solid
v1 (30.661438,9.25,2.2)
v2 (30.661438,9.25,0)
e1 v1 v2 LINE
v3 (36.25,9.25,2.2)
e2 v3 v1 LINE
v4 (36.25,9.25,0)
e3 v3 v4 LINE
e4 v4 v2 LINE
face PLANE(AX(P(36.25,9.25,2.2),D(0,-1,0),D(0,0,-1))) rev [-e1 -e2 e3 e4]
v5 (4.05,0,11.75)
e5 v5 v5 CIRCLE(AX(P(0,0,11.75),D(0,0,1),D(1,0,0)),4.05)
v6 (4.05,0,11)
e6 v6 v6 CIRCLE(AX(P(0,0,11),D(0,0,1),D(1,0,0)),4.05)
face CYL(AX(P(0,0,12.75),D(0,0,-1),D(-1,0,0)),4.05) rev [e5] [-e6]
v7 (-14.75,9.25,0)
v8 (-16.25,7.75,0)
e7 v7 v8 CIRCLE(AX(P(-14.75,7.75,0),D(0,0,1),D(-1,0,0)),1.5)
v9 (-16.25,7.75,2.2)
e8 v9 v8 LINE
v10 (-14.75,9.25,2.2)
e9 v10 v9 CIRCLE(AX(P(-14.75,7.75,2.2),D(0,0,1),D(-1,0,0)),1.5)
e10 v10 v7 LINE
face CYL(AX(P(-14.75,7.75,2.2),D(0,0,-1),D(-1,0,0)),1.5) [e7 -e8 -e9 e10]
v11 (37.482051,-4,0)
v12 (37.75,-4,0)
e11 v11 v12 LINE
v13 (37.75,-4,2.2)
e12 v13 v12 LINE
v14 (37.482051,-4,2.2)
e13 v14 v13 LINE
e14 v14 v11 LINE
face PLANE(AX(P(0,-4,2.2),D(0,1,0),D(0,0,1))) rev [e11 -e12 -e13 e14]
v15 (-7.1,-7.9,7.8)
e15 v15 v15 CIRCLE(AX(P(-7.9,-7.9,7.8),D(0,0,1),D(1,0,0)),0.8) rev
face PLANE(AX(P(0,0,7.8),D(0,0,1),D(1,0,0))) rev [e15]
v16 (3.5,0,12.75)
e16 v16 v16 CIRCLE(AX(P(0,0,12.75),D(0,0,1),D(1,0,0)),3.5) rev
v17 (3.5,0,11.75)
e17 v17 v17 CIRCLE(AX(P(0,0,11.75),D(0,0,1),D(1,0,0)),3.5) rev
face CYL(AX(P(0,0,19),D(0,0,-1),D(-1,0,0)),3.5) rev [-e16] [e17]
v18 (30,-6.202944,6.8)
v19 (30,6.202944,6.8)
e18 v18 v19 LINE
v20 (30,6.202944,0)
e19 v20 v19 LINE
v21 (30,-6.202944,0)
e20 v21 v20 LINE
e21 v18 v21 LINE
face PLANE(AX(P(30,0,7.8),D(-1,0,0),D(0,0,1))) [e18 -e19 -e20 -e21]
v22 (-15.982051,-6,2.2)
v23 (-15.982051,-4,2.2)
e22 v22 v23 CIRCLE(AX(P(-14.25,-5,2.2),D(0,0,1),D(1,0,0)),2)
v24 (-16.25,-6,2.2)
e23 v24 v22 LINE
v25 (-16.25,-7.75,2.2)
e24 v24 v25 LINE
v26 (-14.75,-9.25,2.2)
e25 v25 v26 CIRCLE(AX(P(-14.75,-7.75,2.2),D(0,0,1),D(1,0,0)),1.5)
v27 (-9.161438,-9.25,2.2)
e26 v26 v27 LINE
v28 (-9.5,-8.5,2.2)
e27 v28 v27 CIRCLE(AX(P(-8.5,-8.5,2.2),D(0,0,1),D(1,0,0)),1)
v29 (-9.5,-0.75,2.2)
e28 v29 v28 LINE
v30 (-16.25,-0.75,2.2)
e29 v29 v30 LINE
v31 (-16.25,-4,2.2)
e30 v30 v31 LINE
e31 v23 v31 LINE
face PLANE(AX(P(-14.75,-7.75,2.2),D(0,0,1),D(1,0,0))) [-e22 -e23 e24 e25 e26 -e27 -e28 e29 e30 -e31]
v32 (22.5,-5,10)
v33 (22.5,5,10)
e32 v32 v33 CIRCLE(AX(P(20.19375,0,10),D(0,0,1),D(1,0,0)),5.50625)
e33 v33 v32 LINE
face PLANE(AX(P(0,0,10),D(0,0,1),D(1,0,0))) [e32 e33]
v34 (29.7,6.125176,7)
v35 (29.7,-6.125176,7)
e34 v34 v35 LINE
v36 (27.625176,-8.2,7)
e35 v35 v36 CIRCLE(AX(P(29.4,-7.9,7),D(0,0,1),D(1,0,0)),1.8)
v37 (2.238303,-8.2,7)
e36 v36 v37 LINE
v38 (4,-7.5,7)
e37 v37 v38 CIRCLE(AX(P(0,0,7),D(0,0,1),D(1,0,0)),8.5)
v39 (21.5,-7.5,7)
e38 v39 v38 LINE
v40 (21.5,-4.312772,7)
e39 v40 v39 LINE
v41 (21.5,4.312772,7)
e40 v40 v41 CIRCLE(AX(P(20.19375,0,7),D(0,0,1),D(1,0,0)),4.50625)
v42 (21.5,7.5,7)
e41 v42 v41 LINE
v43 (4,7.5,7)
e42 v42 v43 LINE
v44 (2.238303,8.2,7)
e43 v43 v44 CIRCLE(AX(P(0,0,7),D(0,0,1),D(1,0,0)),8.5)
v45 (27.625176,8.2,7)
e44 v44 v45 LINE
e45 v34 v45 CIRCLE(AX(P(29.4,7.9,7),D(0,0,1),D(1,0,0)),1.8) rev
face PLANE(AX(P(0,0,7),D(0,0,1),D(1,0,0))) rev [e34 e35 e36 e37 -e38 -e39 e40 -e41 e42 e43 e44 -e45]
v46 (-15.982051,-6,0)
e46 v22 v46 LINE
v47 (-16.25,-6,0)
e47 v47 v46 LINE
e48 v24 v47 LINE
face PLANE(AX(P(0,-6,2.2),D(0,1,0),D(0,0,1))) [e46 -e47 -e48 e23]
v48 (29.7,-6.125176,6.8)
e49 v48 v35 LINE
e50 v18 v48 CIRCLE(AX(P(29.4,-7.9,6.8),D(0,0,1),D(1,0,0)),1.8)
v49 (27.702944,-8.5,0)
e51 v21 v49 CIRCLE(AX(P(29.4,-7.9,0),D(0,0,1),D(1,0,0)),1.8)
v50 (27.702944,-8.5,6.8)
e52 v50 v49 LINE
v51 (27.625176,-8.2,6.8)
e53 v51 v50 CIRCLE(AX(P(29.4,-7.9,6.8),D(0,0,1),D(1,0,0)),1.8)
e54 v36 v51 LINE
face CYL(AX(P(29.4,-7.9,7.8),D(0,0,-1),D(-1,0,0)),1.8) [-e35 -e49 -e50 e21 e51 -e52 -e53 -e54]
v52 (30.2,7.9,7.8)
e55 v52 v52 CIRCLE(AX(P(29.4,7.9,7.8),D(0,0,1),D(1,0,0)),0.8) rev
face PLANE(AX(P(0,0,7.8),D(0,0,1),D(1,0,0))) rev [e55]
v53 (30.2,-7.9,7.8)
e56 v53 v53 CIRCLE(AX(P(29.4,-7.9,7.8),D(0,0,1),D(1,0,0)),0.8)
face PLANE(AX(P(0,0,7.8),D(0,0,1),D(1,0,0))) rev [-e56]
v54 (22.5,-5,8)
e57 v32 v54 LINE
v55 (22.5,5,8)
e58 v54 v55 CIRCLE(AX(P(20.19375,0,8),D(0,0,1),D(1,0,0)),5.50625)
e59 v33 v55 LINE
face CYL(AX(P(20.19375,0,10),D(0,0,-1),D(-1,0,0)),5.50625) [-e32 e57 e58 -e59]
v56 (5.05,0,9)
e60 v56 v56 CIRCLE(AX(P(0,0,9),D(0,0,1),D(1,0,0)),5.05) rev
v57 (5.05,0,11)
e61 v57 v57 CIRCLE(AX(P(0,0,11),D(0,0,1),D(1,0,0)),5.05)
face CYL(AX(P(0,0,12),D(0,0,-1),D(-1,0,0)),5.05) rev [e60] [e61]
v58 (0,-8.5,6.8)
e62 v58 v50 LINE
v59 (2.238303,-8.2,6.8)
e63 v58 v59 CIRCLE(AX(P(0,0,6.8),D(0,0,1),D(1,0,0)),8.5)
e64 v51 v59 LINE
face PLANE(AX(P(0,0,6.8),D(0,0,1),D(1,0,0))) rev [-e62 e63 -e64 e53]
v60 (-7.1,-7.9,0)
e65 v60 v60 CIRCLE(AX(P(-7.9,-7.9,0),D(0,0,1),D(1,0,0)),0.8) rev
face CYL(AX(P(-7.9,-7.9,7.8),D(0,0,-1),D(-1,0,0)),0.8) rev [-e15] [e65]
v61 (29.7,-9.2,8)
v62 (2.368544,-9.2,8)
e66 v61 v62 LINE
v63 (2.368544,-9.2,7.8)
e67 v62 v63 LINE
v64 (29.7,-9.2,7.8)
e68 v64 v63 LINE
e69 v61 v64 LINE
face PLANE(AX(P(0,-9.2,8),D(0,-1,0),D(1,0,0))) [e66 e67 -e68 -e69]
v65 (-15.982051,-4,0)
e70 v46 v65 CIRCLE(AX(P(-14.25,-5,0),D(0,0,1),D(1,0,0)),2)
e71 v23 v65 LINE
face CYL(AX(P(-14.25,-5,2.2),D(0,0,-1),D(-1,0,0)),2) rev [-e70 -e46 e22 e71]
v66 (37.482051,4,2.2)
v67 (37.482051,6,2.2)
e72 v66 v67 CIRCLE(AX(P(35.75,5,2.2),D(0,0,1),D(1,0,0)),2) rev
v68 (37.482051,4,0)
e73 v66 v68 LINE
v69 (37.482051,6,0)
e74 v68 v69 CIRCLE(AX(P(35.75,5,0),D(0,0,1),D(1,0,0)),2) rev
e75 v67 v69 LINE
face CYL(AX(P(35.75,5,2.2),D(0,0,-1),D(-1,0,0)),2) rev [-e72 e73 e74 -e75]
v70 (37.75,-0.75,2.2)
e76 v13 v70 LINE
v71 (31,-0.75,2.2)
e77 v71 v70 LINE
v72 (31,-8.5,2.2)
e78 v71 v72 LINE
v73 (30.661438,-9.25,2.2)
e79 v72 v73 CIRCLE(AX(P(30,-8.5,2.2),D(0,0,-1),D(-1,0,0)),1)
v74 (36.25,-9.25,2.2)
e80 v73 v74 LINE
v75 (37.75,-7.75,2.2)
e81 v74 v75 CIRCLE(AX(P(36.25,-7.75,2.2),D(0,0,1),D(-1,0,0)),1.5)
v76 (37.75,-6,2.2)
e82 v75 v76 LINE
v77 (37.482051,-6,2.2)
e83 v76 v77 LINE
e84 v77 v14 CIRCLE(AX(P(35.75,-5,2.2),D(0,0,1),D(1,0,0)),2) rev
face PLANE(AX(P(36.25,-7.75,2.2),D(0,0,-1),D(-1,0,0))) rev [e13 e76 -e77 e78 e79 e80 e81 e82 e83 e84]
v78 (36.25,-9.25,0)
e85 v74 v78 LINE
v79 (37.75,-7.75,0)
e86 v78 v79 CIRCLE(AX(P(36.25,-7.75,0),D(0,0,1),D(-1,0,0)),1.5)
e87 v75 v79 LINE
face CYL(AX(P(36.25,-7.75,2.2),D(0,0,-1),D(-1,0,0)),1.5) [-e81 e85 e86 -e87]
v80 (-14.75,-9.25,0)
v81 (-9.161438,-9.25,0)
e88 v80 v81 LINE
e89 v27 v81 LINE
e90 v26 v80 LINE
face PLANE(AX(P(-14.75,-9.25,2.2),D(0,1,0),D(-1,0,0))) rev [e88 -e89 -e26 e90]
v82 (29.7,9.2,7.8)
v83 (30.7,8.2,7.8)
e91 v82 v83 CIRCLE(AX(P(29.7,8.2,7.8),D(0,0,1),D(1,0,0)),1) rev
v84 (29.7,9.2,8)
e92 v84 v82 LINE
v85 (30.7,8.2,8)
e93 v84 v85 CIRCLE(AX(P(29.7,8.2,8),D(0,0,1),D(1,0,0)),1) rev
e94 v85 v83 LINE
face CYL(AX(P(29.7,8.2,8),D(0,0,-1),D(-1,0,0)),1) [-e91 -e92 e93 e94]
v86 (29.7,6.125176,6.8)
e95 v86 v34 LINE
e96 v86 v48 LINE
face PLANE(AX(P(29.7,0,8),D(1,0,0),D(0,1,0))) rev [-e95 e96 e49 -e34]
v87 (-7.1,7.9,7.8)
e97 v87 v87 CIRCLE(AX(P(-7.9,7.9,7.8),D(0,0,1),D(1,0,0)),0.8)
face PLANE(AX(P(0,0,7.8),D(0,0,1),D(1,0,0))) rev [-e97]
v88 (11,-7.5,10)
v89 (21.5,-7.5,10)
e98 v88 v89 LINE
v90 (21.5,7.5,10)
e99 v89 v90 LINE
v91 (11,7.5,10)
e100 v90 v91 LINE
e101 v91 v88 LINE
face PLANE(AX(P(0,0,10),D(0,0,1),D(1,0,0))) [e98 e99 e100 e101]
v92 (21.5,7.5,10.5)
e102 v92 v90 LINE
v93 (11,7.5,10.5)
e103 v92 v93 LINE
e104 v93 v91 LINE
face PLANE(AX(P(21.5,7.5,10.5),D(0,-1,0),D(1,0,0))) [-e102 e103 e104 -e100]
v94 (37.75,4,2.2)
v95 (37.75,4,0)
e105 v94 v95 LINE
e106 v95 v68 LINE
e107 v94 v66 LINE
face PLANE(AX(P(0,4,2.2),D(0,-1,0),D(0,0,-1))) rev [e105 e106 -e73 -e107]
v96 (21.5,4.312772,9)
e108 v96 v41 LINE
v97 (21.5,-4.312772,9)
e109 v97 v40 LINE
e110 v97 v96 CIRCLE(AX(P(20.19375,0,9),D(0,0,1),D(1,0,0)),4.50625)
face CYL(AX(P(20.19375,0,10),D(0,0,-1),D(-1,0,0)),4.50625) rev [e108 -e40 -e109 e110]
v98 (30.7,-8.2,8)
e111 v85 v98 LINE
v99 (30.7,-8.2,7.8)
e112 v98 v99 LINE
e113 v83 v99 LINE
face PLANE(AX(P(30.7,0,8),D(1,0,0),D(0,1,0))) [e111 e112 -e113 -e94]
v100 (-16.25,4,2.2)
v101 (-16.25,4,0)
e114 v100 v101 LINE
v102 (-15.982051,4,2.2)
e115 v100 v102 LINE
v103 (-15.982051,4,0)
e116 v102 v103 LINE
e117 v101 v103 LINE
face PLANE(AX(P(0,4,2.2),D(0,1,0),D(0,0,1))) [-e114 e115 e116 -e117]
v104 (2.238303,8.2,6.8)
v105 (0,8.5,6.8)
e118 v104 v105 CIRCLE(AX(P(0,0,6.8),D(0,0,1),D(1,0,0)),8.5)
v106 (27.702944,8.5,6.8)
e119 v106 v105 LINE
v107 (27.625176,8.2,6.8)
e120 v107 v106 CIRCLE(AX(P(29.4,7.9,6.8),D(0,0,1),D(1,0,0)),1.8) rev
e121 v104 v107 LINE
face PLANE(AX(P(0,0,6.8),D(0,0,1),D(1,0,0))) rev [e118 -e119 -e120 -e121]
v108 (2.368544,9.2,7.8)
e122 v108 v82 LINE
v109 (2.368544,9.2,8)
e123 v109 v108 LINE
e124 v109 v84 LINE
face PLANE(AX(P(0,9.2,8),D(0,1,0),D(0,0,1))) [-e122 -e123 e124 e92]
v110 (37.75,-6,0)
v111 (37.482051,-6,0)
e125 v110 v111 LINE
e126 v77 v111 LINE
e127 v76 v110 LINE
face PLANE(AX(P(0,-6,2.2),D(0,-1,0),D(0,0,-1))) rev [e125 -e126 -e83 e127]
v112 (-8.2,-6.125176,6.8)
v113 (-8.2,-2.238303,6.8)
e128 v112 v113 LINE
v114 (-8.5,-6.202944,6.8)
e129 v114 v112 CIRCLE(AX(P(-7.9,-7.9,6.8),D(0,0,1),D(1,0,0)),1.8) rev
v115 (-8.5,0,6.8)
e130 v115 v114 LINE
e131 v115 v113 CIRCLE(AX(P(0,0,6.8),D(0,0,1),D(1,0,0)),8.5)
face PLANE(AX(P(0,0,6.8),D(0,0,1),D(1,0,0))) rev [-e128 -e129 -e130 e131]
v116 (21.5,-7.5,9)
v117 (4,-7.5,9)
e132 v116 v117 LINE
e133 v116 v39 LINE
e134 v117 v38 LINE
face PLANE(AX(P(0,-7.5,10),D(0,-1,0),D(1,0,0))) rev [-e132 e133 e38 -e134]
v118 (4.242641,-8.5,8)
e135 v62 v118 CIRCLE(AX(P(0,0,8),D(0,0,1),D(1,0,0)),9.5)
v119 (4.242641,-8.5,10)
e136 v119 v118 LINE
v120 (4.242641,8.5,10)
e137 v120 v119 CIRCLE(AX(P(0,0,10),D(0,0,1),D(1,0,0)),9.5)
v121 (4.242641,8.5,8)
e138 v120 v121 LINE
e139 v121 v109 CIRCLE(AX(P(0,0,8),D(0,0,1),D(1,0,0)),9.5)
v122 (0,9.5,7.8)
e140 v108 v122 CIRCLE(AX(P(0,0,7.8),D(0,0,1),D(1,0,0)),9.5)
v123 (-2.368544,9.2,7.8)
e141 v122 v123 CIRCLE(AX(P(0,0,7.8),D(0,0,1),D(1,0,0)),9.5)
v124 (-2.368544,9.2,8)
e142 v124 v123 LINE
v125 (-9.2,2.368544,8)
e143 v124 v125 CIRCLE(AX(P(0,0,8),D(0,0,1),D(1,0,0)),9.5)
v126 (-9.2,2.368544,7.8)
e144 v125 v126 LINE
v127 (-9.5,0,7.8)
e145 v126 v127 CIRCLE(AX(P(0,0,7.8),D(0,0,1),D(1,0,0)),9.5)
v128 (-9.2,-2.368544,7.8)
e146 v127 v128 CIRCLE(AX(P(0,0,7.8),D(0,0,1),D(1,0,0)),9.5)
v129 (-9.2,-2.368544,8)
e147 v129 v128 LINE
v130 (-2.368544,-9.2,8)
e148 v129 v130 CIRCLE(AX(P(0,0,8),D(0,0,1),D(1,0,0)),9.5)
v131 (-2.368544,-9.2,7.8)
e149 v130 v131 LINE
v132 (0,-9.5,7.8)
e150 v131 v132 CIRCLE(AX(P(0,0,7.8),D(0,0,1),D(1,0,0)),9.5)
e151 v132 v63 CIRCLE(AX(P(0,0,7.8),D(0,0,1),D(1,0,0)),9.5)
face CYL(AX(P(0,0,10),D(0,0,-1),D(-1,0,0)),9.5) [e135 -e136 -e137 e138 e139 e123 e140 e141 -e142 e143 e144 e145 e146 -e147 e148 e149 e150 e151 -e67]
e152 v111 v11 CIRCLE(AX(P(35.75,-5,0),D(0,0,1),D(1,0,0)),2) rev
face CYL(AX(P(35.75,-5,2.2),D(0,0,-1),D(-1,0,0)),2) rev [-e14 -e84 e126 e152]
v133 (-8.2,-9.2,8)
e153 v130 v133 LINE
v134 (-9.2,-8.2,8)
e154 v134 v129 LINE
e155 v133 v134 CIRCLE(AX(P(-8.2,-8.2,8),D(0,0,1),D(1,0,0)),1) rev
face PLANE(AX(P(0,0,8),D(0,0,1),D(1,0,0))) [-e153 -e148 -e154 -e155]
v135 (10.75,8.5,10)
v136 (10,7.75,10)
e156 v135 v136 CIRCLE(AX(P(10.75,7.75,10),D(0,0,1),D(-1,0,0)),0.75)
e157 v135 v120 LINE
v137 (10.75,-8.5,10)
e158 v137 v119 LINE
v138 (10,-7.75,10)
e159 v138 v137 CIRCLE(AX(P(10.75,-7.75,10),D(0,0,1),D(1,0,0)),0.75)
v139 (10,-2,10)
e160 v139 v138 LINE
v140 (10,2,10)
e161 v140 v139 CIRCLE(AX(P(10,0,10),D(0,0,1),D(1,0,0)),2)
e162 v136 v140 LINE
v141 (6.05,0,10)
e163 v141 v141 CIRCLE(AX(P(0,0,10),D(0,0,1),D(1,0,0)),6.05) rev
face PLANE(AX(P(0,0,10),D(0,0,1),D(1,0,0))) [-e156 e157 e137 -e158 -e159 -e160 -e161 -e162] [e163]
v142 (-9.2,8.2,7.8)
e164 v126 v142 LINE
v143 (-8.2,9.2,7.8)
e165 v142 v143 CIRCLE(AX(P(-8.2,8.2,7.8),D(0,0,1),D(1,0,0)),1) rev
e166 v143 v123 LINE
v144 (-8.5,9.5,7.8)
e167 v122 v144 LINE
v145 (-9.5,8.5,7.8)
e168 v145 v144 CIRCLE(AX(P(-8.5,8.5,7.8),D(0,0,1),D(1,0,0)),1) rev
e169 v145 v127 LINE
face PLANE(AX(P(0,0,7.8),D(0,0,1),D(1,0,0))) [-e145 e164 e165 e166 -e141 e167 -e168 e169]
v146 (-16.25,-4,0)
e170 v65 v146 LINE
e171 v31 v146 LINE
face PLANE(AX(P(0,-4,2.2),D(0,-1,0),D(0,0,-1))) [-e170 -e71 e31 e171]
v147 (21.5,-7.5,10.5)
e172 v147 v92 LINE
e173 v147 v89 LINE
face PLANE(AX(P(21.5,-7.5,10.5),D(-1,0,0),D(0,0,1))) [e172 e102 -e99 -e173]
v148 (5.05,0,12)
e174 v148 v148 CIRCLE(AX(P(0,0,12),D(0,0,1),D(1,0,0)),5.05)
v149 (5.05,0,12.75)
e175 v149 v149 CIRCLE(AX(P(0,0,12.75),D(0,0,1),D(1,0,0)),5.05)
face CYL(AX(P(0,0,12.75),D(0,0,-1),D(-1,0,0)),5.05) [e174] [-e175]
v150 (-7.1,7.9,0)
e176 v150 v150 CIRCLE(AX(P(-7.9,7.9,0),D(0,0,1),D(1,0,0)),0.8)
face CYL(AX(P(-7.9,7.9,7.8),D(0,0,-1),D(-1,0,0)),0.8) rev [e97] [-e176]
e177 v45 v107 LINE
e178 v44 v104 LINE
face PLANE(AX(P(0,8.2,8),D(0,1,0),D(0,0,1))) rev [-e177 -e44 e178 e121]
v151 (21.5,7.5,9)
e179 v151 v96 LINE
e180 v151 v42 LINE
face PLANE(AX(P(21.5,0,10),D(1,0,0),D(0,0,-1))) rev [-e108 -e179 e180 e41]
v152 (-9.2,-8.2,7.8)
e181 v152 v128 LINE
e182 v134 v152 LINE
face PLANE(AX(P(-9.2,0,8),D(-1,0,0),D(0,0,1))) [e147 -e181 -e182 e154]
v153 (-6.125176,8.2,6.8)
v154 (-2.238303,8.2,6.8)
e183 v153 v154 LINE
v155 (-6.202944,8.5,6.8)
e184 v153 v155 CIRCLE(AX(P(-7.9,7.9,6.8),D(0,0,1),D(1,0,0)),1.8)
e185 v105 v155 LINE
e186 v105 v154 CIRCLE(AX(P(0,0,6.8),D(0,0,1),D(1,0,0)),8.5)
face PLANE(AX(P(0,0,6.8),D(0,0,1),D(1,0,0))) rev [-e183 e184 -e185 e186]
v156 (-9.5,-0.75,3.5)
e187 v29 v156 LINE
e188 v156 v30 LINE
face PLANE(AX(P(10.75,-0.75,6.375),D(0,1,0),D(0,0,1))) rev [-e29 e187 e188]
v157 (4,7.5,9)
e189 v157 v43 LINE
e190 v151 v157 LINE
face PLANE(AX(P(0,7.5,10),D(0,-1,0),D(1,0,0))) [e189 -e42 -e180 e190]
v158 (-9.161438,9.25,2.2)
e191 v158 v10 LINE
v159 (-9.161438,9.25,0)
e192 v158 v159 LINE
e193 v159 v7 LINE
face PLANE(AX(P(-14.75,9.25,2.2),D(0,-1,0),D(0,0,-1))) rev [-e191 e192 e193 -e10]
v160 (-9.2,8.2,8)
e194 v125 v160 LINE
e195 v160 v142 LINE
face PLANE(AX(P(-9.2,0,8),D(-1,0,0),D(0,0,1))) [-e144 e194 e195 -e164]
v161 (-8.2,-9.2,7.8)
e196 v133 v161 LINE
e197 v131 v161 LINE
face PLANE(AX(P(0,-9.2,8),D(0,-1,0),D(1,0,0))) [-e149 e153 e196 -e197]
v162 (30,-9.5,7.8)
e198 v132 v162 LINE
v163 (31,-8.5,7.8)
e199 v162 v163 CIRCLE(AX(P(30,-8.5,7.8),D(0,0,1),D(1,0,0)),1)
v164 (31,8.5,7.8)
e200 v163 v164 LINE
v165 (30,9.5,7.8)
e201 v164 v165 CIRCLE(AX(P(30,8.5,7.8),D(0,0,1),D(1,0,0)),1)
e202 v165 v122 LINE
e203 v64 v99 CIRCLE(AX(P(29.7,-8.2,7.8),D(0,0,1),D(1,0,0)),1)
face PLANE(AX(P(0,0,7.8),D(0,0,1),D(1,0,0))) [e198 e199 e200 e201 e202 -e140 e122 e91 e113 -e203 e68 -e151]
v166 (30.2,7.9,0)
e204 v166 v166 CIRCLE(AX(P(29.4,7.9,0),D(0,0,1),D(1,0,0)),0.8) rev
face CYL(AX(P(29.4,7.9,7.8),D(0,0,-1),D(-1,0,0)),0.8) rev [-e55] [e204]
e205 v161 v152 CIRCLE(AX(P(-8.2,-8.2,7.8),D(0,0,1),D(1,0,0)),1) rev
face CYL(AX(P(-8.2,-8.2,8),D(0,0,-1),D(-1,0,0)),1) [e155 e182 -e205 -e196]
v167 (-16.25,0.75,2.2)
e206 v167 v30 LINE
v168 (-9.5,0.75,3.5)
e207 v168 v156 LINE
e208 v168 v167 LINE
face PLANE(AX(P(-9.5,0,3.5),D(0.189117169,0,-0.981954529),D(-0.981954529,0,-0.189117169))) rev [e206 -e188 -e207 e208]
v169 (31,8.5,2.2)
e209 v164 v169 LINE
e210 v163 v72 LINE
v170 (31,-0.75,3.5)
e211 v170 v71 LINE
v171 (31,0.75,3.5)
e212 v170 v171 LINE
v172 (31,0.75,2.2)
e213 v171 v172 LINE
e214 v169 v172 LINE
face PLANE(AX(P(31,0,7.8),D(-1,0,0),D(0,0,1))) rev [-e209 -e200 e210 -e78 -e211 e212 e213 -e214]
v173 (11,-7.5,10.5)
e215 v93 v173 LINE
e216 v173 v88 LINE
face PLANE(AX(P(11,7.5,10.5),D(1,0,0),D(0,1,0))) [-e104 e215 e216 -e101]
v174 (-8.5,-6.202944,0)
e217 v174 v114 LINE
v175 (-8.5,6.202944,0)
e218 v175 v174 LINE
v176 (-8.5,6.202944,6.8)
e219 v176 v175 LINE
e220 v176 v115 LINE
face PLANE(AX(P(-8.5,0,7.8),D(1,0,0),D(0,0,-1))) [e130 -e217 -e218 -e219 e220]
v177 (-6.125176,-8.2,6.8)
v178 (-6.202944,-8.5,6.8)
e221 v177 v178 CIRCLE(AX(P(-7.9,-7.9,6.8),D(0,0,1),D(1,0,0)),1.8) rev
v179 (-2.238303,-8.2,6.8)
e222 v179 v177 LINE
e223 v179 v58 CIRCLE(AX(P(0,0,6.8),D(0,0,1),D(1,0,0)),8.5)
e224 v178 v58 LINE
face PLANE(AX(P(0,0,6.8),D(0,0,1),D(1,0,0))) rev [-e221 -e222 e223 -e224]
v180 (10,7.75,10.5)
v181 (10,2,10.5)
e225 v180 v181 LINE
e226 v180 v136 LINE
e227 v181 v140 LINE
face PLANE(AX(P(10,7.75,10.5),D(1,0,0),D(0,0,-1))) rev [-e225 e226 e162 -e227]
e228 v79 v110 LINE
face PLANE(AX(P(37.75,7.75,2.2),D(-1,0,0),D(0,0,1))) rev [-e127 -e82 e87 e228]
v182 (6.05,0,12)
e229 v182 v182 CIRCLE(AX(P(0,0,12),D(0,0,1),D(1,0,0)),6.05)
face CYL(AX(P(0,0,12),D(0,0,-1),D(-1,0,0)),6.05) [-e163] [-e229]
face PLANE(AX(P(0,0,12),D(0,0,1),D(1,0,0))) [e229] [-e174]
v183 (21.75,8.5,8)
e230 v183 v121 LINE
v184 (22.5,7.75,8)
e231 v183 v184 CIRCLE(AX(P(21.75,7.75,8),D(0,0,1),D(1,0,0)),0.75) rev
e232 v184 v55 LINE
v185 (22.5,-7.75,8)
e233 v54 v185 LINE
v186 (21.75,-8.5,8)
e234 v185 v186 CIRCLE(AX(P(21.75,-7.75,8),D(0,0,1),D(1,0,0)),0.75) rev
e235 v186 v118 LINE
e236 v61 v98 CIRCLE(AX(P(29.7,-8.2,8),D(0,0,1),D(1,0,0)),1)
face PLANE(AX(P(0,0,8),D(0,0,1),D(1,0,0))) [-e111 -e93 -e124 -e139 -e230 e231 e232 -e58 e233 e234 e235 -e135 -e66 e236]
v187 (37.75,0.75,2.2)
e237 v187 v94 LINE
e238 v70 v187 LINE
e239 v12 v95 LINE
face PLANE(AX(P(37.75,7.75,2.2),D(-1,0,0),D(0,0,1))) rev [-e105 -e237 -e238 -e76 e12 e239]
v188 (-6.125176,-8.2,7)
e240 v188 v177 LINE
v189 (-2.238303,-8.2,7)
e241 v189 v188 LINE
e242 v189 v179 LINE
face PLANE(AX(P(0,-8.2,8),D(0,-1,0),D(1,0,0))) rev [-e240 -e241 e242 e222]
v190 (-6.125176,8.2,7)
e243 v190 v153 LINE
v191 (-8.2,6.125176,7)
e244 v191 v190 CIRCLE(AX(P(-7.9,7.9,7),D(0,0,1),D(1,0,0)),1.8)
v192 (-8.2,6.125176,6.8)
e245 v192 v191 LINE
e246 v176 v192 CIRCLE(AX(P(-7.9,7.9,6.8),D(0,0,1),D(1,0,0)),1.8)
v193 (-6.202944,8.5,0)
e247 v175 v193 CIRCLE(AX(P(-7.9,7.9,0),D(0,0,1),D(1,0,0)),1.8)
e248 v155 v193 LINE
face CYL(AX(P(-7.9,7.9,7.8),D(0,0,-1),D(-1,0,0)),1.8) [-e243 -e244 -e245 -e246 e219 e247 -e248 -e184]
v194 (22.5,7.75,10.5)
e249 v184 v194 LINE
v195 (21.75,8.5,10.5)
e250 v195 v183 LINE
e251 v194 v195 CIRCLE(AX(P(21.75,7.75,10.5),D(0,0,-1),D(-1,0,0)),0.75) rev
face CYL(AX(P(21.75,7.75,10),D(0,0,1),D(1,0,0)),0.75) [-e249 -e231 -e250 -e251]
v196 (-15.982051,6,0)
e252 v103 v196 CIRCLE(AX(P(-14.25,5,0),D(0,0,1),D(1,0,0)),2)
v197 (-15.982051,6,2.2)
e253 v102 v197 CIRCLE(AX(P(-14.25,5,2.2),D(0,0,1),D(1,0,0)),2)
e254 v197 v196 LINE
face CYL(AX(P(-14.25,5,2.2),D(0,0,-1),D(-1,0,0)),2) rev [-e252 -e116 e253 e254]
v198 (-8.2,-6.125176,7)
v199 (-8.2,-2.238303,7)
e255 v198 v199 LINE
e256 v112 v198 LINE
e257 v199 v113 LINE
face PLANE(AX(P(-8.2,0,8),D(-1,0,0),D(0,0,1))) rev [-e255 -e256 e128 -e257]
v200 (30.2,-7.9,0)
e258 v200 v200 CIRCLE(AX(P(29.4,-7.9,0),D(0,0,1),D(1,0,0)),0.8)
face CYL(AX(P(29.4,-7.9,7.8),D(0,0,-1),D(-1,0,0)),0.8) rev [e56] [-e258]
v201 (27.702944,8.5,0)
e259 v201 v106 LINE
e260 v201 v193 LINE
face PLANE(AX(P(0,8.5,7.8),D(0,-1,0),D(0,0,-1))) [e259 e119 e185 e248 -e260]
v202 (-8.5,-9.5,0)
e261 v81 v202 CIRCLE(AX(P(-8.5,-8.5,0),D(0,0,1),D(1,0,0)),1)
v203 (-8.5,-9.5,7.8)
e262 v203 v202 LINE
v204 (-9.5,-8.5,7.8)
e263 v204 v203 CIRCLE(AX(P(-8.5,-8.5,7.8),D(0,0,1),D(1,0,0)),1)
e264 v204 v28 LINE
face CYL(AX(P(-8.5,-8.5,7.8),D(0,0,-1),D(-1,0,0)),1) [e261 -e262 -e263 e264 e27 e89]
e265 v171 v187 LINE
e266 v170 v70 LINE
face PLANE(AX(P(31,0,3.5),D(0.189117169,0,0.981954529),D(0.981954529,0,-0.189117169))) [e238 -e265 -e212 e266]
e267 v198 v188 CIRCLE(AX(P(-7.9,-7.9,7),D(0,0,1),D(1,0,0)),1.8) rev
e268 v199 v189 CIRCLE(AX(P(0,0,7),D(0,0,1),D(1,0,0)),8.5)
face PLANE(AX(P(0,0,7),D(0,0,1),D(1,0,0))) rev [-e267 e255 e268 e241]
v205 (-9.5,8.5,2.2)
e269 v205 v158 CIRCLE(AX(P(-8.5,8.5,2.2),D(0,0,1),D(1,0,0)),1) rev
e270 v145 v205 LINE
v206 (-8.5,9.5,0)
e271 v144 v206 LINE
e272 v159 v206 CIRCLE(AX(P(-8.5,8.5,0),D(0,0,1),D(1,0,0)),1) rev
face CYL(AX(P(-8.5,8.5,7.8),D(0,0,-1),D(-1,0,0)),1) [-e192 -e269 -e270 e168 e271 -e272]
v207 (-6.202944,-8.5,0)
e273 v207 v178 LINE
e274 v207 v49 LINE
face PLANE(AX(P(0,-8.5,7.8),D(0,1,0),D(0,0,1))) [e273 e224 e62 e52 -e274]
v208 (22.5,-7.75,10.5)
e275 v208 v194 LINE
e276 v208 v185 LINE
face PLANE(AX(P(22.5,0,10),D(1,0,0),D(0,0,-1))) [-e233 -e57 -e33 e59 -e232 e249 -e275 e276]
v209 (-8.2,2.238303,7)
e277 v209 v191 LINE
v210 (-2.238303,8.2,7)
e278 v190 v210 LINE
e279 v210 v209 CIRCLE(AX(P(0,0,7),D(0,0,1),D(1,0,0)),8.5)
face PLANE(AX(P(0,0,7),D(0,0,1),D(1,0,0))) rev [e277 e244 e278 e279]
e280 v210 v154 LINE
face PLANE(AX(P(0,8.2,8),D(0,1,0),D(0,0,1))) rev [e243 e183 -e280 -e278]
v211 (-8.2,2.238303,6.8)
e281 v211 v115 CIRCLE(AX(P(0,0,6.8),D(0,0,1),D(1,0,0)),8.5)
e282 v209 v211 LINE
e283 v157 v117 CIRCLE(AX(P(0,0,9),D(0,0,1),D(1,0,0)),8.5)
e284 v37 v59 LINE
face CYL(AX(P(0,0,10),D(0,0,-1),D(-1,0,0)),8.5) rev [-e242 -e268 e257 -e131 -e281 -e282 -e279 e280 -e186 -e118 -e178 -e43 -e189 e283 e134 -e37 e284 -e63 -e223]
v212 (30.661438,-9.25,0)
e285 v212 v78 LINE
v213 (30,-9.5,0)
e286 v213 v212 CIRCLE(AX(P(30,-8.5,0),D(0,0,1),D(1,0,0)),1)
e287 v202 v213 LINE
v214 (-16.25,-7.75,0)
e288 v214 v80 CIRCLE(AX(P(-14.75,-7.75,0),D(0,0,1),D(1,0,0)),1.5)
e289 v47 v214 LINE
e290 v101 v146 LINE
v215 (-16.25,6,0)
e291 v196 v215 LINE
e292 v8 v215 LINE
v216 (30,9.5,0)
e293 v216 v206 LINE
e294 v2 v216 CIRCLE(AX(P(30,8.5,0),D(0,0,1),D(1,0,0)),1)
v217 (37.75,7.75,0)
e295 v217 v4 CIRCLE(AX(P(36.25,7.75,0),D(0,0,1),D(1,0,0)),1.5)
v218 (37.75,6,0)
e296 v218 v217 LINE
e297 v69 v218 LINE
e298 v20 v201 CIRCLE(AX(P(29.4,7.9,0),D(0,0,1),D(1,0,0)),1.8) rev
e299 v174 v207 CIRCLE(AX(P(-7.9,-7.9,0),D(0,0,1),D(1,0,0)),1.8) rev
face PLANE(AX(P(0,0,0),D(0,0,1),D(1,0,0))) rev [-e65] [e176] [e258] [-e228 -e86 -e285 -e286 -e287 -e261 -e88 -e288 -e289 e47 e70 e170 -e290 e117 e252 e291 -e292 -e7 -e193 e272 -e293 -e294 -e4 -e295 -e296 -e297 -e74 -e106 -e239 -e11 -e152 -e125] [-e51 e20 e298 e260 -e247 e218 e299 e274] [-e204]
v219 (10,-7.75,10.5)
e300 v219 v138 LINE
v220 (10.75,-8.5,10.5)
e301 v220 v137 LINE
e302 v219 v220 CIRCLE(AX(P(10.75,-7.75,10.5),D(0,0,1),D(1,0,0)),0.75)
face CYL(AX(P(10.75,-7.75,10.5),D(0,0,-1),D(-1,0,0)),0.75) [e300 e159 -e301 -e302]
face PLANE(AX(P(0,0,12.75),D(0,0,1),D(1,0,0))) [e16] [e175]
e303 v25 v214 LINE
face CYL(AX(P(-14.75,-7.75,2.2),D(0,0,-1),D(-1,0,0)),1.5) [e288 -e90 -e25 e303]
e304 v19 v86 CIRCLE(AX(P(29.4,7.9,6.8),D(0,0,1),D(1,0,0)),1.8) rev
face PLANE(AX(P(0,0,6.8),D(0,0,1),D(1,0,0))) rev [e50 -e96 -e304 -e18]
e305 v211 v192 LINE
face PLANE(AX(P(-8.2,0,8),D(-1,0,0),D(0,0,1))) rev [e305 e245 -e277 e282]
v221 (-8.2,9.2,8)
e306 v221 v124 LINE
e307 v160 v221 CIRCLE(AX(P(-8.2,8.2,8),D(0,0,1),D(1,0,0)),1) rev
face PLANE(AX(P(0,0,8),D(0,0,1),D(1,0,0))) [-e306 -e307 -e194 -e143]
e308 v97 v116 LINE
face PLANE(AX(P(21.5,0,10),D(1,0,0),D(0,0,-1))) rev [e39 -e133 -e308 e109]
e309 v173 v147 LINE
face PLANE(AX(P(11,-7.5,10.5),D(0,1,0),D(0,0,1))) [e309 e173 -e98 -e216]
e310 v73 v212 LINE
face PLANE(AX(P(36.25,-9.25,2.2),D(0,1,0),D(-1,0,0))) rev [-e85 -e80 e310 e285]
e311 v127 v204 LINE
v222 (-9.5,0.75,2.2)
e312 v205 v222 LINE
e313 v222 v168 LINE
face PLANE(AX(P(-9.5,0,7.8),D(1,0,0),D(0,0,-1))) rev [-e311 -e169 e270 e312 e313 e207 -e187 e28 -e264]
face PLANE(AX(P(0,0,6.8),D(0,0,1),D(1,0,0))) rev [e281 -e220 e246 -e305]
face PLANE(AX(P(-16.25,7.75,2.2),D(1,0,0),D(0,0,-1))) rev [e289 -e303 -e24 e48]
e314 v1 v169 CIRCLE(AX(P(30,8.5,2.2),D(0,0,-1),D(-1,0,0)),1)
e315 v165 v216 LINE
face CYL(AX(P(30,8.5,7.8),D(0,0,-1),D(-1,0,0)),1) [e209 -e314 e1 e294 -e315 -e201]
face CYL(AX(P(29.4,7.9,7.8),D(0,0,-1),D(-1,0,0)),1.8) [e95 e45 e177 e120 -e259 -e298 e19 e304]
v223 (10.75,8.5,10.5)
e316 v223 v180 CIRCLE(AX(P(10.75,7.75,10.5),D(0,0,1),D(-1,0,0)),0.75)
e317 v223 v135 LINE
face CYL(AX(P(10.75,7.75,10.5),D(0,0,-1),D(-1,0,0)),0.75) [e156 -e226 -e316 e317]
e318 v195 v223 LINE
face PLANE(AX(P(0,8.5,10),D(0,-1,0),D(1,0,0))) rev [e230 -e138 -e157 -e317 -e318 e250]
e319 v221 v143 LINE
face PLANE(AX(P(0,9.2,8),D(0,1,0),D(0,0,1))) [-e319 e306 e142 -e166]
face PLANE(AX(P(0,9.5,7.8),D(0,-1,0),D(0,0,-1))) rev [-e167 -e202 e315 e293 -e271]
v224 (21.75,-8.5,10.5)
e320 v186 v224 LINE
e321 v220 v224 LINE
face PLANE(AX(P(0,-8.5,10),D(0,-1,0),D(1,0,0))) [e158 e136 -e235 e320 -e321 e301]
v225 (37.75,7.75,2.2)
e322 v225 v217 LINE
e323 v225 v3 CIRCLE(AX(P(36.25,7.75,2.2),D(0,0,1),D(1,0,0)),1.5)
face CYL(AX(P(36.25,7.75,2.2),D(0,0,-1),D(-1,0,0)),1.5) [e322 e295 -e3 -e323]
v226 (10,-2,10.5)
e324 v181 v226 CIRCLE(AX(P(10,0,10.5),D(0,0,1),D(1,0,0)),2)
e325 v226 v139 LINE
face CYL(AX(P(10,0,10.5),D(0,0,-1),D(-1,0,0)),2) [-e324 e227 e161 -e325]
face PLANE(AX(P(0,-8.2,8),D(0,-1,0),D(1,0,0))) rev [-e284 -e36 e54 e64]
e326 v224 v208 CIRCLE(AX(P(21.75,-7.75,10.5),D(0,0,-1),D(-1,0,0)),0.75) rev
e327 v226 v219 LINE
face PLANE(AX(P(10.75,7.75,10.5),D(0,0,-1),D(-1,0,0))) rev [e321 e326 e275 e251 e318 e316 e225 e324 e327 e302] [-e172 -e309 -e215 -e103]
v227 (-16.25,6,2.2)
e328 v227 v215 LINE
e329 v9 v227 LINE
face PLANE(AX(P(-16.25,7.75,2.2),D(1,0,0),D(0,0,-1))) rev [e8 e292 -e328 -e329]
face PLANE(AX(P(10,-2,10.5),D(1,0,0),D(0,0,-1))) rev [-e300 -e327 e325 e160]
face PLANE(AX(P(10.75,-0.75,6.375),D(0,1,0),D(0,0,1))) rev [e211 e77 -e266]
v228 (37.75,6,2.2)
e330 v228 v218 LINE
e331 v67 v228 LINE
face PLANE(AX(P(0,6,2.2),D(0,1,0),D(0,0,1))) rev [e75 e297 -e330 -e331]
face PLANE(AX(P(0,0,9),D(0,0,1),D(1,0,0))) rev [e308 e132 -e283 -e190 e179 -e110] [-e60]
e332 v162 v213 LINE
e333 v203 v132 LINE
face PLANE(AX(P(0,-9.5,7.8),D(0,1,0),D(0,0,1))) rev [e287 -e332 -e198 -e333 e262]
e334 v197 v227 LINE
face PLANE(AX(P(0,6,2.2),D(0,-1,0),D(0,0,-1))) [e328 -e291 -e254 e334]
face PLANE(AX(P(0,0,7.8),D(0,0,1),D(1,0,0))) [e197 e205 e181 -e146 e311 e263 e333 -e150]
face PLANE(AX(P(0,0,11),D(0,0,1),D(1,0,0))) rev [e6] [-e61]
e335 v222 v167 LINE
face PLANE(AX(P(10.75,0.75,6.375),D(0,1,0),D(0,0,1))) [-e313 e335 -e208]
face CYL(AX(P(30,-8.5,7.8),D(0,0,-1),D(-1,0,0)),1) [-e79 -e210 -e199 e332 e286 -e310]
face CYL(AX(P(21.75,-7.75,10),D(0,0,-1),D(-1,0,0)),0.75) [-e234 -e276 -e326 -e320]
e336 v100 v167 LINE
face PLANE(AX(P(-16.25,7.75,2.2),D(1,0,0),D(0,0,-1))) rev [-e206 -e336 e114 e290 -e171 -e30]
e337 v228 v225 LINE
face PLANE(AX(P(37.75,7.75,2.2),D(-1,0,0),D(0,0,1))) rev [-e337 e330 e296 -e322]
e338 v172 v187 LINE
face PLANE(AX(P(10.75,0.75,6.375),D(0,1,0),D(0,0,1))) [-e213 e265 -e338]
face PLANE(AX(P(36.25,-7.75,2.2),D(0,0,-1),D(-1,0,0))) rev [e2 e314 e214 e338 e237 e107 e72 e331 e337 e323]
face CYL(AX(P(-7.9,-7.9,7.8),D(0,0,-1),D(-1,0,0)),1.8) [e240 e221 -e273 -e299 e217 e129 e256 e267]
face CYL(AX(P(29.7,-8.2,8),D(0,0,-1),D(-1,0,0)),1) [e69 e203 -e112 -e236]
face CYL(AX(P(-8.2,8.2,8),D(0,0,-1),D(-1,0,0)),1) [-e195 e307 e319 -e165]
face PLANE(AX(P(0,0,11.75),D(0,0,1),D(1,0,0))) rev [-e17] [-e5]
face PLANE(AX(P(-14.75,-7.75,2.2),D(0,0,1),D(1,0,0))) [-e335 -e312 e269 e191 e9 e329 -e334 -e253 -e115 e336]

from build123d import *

# Parameters (mm, degrees)
CROQUIS1_R              = 3.5
CROQUIS1_R_2            = 0.8
SALIENTE_EXTRUIR1_DEPTH = 7.8
SALIENTE_EXTRUIR2_DEPTH = 0.2
CROQUIS2_5_R            = 3.5
SALIENTE_EXTRUIR4_DEPTH = 2.2
CROQUIS5_R              = 6.05
CROQUIS5_R_2            = 5.05
SALIENTE_EXTRUIR5_DEPTH = 12
CROQUIS5_3_R            = 5.05
CROQUIS5_3_R_2          = 3.5
SALIENTE_EXTRUIR6_DEPTH = 12.75
VACIADO6_DEPTH          = 6.8
VACIADO6_START          = 6.8
VACIADO6_2_DEPTH        = 2.2
VACIADO6_START_2        = 9
VACIADO6_3_OUTLINE_R    = 5.05
VACIADO6_3_DEPTH        = 2
VACIADO6_START_3        = 11
VACIADO6_4_OUTLINE_R    = 4.05
VACIADO6_4_DEPTH        = 0.75
VACIADO6_5_DEPTH        = 0.2
CROQUIS1_7_R            = 3.5
CORTAR_EXTRUIR3_DEPTH   = 19
SALIENTE_EXTRUIR7_DEPTH = 2.2
CORTAR_EXTRUIR7_DEPTH   = 2.2
NERVIO3_REACH           = 42.962
CROQUIS13_WALL_W        = 90.79779042
CROQUIS13_WALL_H        = 1.5
NERVIO6_REACH           = 42.962
CROQUIS14_WALL_W        = 90.79779042
CROQUIS14_WALL_H        = 1.5
CROQUIS15_W             = 10.5
CROQUIS15_H             = 15
SALIENTE_EXTRUIR8_DEPTH = 0.5
REDONDEO1_R             = 0.75


# Read off the part's stored shape, not the designer's step: Vaciado6
with BuildPart() as part:
    # Croquis1 → Saliente-Extruir1 (new body)
    with BuildSketch(Plane.XY):
        with BuildLine():
            Line((-9.5, 8.5), (-9.5, -8.5))
            ThreePointArc((-9.5, -8.5), (-9.207106781, -9.207106781), (-8.5, -9.5))
            Line((-8.5, -9.5), (30, -9.5))
            ThreePointArc((30, -9.5), (30.707106781, -9.207106781), (31, -8.5))
            Line((31, -8.5), (31, 8.5))
            ThreePointArc((31, 8.5), (30.707106781, 9.207106781), (30, 9.5))
            Line((30, 9.5), (-8.5, 9.5))
            ThreePointArc((-8.5, 9.5), (-9.207106781, 9.207106781), (-9.5, 8.5))
        make_face()
        Circle(CROQUIS1_R, mode=Mode.SUBTRACT)
        with Locations((29.4, -7.9)):
            Circle(CROQUIS1_R_2, mode=Mode.SUBTRACT)
        with Locations((-7.9, -7.9)):
            Circle(CROQUIS1_R_2, mode=Mode.SUBTRACT)
        with Locations((-7.9, 7.9)):
            Circle(CROQUIS1_R_2, mode=Mode.SUBTRACT)
        with Locations((29.4, 7.9)):
            Circle(CROQUIS1_R_2, mode=Mode.SUBTRACT)
    extrude(amount=SALIENTE_EXTRUIR1_DEPTH)

    # Croquis2 → Saliente-Extruir2 (add)
    with BuildSketch(Plane.XY.offset(7.8)):
        with BuildLine():
            Line((2.368543856, -9.2), (29.7, -9.2))
            ThreePointArc((29.7, -9.2), (30.407106781, -8.907106781), (30.7, -8.2))
            Line((30.7, -8.2), (30.7, 8.2))
            ThreePointArc((30.7, 8.2), (30.407106781, 8.907106781), (29.7, 9.2))
            Line((29.7, 9.2), (2.368543856, 9.2))
            ThreePointArc((2.368543856, 9.2), (3.324069835, 8.899469632), (4.242640687, 8.5))
            Line((4.242640687, 8.5), (22.5, 8.5))
            Line((22.5, 8.5), (22.5, 5))
            ThreePointArc((22.5, 5), (25.7, 0), (22.5, -5))
            Line((22.5, -5), (22.5, -8.5))
            Line((22.5, -8.5), (4.242640687, -8.5))
            ThreePointArc((4.242640687, -8.5), (3.324069835, -8.899469632), (2.368543856, -9.2))
        make_face()
        with BuildLine():
            Line((-8.2, -9.2), (-2.368543856, -9.2))
            ThreePointArc((-2.368543856, -9.2), (-6.717514421, -6.717514421), (-9.2, -2.368543856))
            Line((-9.2, -2.368543856), (-9.2, -8.2))
            ThreePointArc((-9.2, -8.2), (-8.907106781, -8.907106781), (-8.2, -9.2))
        make_face()
        with BuildLine():
            Line((-9.2, 8.2), (-9.2, 2.368543856))
            ThreePointArc((-9.2, 2.368543856), (-6.717514421, 6.717514421), (-2.368543856, 9.2))
            Line((-2.368543856, 9.2), (-8.2, 9.2))
            ThreePointArc((-8.2, 9.2), (-8.907106781, 8.907106781), (-9.2, 8.2))
        make_face()
    extrude(amount=SALIENTE_EXTRUIR2_DEPTH)

    # Croquis2<5> → Saliente-Extruir4 (add)
    # profile 1 of 6: a face of its own
    with BuildSketch(Plane.XY.offset(7.8)):
        with BuildLine():
            ThreePointArc((9.5, 0), (8.079451916, -4.997244915), (4.242640687, -8.5))
            Line((4.242640687, -8.5), (22.5, -8.5))
            Line((22.5, -8.5), (22.5, -5))
            Line((22.5, -5), (22.5, 5))
            Line((22.5, 5), (22.5, 8.5))
            Line((22.5, 8.5), (4.242640687, 8.5))
            ThreePointArc((4.242640687, 8.5), (8.079451916, 4.997244915), (9.5, 0))
        make_face()
    # profile 2 of 6: a face of its own
    with BuildSketch(Plane.XY.offset(7.8)):
        with BuildLine():
            Line((-2.368543856, -9.2), (2.368543856, -9.2))
            ThreePointArc((2.368543856, -9.2), (3.324069835, -8.899469632), (4.242640687, -8.5))
            ThreePointArc((4.242640687, -8.5), (8.079451916, -4.997244915), (9.5, 0))
            ThreePointArc((9.5, 0), (8.079451916, 4.997244915), (4.242640687, 8.5))
            ThreePointArc((4.242640687, 8.5), (3.324069835, 8.899469632), (2.368543856, 9.2))
            Line((2.368543856, 9.2), (-2.368543856, 9.2))
            ThreePointArc((-2.368543856, 9.2), (-6.717514421, 6.717514421), (-9.2, 2.368543856))
            Line((-9.2, 2.368543856), (-9.2, -2.368543856))
            ThreePointArc((-9.2, -2.368543856), (-6.717514421, -6.717514421), (-2.368543856, -9.2))
        make_face()
        Circle(CROQUIS2_5_R, mode=Mode.SUBTRACT)
    # profile 3 of 6: a face of its own
    with BuildSketch(Plane.XY.offset(7.8)):
        with BuildLine():
            Line((22.5, 5), (22.5, -5))
            ThreePointArc((22.5, -5), (25.7, 0), (22.5, 5))
        make_face()
    # profile 4 of 6: a face of its own
    with BuildSketch(Plane.XY.offset(7.8)):
        with BuildLine():
            ThreePointArc((-2.368543856, -9.2), (0, -9.5), (2.368543856, -9.2))
            Line((2.368543856, -9.2), (-2.368543856, -9.2))
        make_face()
    # profile 5 of 6: a face of its own
    with BuildSketch(Plane.XY.offset(7.8)):
        with BuildLine():
            ThreePointArc((-9.2, 2.368543856), (-9.5, 0), (-9.2, -2.368543856))
            Line((-9.2, -2.368543856), (-9.2, 2.368543856))
        make_face()
    # profile 6 of 6: a face of its own
    with BuildSketch(Plane.XY.offset(7.8)):
        with BuildLine():
            Line((-2.368543856, 9.2), (2.368543856, 9.2))
            ThreePointArc((2.368543856, 9.2), (0, 9.5), (-2.368543856, 9.2))
        make_face()
    extrude(amount=SALIENTE_EXTRUIR4_DEPTH)

    # Croquis5 → Saliente-Extruir5 (add)
    with BuildSketch(Plane.XY):
        Circle(CROQUIS5_R)
        Circle(CROQUIS5_R_2, mode=Mode.SUBTRACT)
    extrude(amount=SALIENTE_EXTRUIR5_DEPTH)

    # Croquis5<3> → Saliente-Extruir6 (add)
    # profile 1 of 2: a face of its own
    with BuildSketch(Plane.XY):
        Circle(CROQUIS5_3_R)
        Circle(CROQUIS5_3_R_2, mode=Mode.SUBTRACT)
    # profile 2 of 2: a face of its own
    with BuildSketch(Plane.XY):
        Circle(CROQUIS5_3_R_2)
    extrude(amount=SALIENTE_EXTRUIR6_DEPTH)

    # Vaciado6 outline → Vaciado6 (cut)
    with BuildSketch(Plane.XY):
        with BuildLine():
            ThreePointArc((-8.5, -6.202943725), (-6.627207794, -6.627207794), (-6.202943725, -8.5))
            Line((-6.202943725, -8.5), (27.702943725, -8.5))
            ThreePointArc((27.702943725, -8.5), (28.127207794, -6.627207794), (30, -6.202943725))
            Line((30, -6.202943725), (30, 6.202943725))
            ThreePointArc((30, 6.202943725), (28.127207794, 6.627207794), (27.702943725, 8.5))
            Line((27.702943725, 8.5), (-6.202943725, 8.5))
            ThreePointArc((-6.202943725, 8.5), (-6.627207794, 6.627207794), (-8.5, 6.202943725))
            Line((-8.5, 6.202943725), (-8.5, -6.202943725))
        make_face()
    extrude(amount=VACIADO6_DEPTH, mode=Mode.SUBTRACT)

    # Vaciado6 2 outline → Vaciado6 2 (cut)
    with BuildSketch(Plane.XY.offset(VACIADO6_START)):
        with BuildLine():
            Line((4, -7.5), (21.5, -7.5))
            Line((21.5, -7.5), (21.5, -4.312771731))
            ThreePointArc((21.5, -4.312771731), (24.7, 0), (21.5, 4.312771731))
            Line((21.5, 4.312771731), (21.5, 7.5))
            Line((21.5, 7.5), (4, 7.5))
            ThreePointArc((4, 7.5), (-8.5, 0), (4, -7.5))
        make_face()
    extrude(amount=VACIADO6_2_DEPTH, mode=Mode.SUBTRACT)

    # Vaciado6 3 outline → Vaciado6 3 (cut)
    with BuildSketch(Plane.XY.offset(VACIADO6_START_2)):
        Circle(VACIADO6_3_OUTLINE_R)
    extrude(amount=VACIADO6_3_DEPTH, mode=Mode.SUBTRACT)

    # Vaciado6 4 outline → Vaciado6 4 (cut)
    with BuildSketch(Plane.XY.offset(VACIADO6_START_3)):
        Circle(VACIADO6_4_OUTLINE_R)
    extrude(amount=VACIADO6_4_DEPTH, mode=Mode.SUBTRACT)

    # Vaciado6 5 outline → Vaciado6 5 (cut)
    with BuildSketch(Plane.XY.offset(VACIADO6_START)):
        with BuildLine():
            Line((-8.2, -2.238302929), (-8.2, -6.125176065))
            ThreePointArc((-8.2, -6.125176065), (-6.627207794, -6.627207794), (-6.125176065, -8.2))
            Line((-6.125176065, -8.2), (-2.238302929, -8.2))
            ThreePointArc((-2.238302929, -8.2), (-6.01040764, -6.01040764), (-8.2, -2.238302929))
        make_face()
        with BuildLine():
            Line((-8.2, 6.125176065), (-8.2, 2.238302929))
            ThreePointArc((-8.2, 2.238302929), (-6.01040764, 6.01040764), (-2.238302929, 8.2))
            Line((-2.238302929, 8.2), (-6.125176065, 8.2))
            ThreePointArc((-6.125176065, 8.2), (-6.627207794, 6.627207794), (-8.2, 6.125176065))
        make_face()
        with BuildLine():
            ThreePointArc((4, -7.5), (3.138726789, -7.899265418), (2.238302929, -8.2))
            Line((2.238302929, -8.2), (27.625176065, -8.2))
            ThreePointArc((27.625176065, -8.2), (28.127207794, -6.627207794), (29.7, -6.125176065))
            Line((29.7, -6.125176065), (29.7, 6.125176065))
            ThreePointArc((29.7, 6.125176065), (28.127207794, 6.627207794), (27.625176065, 8.2))
            Line((27.625176065, 8.2), (2.238302929, 8.2))
            ThreePointArc((2.238302929, 8.2), (3.138726789, 7.899265418), (4, 7.5))
            Line((4, 7.5), (21.5, 7.5))
            Line((21.5, 7.5), (21.5, 4.312771731))
            ThreePointArc((21.5, 4.312771731), (24.7, 0), (21.5, -4.312771731))
            Line((21.5, -4.312771731), (21.5, -7.5))
            Line((21.5, -7.5), (4, -7.5))
        make_face()
    extrude(amount=VACIADO6_5_DEPTH, mode=Mode.SUBTRACT)

    # Croquis1<7> → Cortar-Extruir3 (cut)
    with BuildSketch(Plane.XY):
        Circle(CROQUIS1_7_R)
    extrude(amount=CORTAR_EXTRUIR3_DEPTH, mode=Mode.SUBTRACT)

    # Croquis8 → Saliente-Extruir7 (add)
    with BuildSketch(Plane.XY):
        with BuildLine():
            Line((-16.25, 7.75), (-16.25, -7.75))
            ThreePointArc((-16.25, -7.75), (-15.810660172, -8.810660172), (-14.75, -9.25))
            Line((-14.75, -9.25), (-9.161437828, -9.25))
            Line((-9.161437828, -9.25), (-9.161437828, 9.25))
            Line((-9.161437828, 9.25), (-14.75, 9.25))
            ThreePointArc((-14.75, 9.25), (-15.810660172, 8.810660172), (-16.25, 7.75))
        make_face()
        with BuildLine():
            Line((30.661437828, 9.25), (30.661437828, -9.25))
            Line((30.661437828, -9.25), (36.25, -9.25))
            ThreePointArc((36.25, -9.25), (37.310660172, -8.810660172), (37.75, -7.75))
            Line((37.75, -7.75), (37.75, 7.75))
            ThreePointArc((37.75, 7.75), (37.310660172, 8.810660172), (36.25, 9.25))
            Line((36.25, 9.25), (30.661437828, 9.25))
        make_face()
    extrude(amount=SALIENTE_EXTRUIR7_DEPTH)

    # Croquis9 → Cortar-Extruir7 (cut)
    with BuildSketch(Plane.XY):
        with BuildLine():
            Line((-16.25, 4), (-15.982050808, 4))
            ThreePointArc((-15.982050808, 4), (-12.25, 5), (-15.982050808, 6))
            Line((-15.982050808, 6), (-16.25, 6))
            Line((-16.25, 6), (-16.25, 4))
        make_face()
        with BuildLine():
            Line((-16.25, -6), (-15.982050808, -6))
            ThreePointArc((-15.982050808, -6), (-12.25, -5), (-15.982050808, -4))
            Line((-15.982050808, -4), (-16.25, -4))
            Line((-16.25, -4), (-16.25, -6))
        make_face()
        with BuildLine():
            ThreePointArc((37.482050808, -6), (33.75, -5), (37.482050808, -4))
            Line((37.482050808, -4), (37.75, -4))
            Line((37.75, -4), (37.75, -6))
            Line((37.75, -6), (37.482050808, -6))
        make_face()
        with BuildLine():
            ThreePointArc((37.482050808, 4), (33.75, 5), (37.482050808, 6))
            Line((37.482050808, 6), (37.75, 6))
            Line((37.75, 6), (37.75, 4))
            Line((37.75, 4), (37.482050808, 4))
        make_face()
    extrude(amount=CORTAR_EXTRUIR7_DEPTH, mode=Mode.SUBTRACT)

    # Croquis13 wall → Nervio3 (add, up to next)
    with BuildSketch(Plane(origin=(-12.875, 0, 2.85), x_dir=(-0.981954528773, 0, -0.189117168504), z_dir=(-0.189117168504, 0, 0.981954528773)), mode=Mode.PRIVATE) as nervio3_sk1:
        Rectangle(CROQUIS13_WALL_W, CROQUIS13_WALL_H)
    nervio3_tool1 = extrude(nervio3_sk1.sketch, amount=-NERVIO3_REACH, mode=Mode.PRIVATE) - part.part
    add(nervio3_tool1.solids().sort_by_distance((-12.875, 0, 2.85))[0])

    # Croquis14 wall → Nervio6 (add, up to next)
    with BuildSketch(Plane(origin=(34.375, 0, 2.85), x_dir=(0.981954528773, 0, -0.189117168504), z_dir=(-0.189117168504, 0, -0.981954528773)), mode=Mode.PRIVATE) as nervio6_sk1:
        Rectangle(CROQUIS14_WALL_W, CROQUIS14_WALL_H)
    nervio6_tool1 = extrude(nervio6_sk1.sketch, amount=NERVIO6_REACH, mode=Mode.PRIVATE) - part.part
    add(nervio6_tool1.solids().sort_by_distance((34.375, 0, 2.85))[0])

    # Croquis15 → Saliente-Extruir8 (add)
    with BuildSketch(Plane.XY.offset(10)):
        with BuildLine():
            Line((22.5, 8.5), (10.75, 8.5))
            ThreePointArc((10.75, 8.5), (10.219669914, 8.280330086), (10, 7.75))
            Line((10, 7.75), (10, 2))
            ThreePointArc((10, 2), (8, 0), (10, -2))
            Line((10, -2), (10, -7.75))
            ThreePointArc((10, -7.75), (10.219669914, -8.280330086), (10.75, -8.5))
            Line((10.75, -8.5), (22.5, -8.5))
            Line((22.5, -8.5), (22.5, 8.5))
        make_face()
        with Locations((16.25, 0)):
            Rectangle(CROQUIS15_W, CROQUIS15_H, mode=Mode.SUBTRACT)
    extrude(amount=SALIENTE_EXTRUIR8_DEPTH)

    # Redondeo1
    redondeo1_edges = [part.edges().sort_by_distance(p)[0] for p in [
        (22.5, 8.5, 9.25),
        (22.5, -8.5, 9.25),
    ]]
    fillet(redondeo1_edges, radius=REDONDEO1_R)


solid = part.part
